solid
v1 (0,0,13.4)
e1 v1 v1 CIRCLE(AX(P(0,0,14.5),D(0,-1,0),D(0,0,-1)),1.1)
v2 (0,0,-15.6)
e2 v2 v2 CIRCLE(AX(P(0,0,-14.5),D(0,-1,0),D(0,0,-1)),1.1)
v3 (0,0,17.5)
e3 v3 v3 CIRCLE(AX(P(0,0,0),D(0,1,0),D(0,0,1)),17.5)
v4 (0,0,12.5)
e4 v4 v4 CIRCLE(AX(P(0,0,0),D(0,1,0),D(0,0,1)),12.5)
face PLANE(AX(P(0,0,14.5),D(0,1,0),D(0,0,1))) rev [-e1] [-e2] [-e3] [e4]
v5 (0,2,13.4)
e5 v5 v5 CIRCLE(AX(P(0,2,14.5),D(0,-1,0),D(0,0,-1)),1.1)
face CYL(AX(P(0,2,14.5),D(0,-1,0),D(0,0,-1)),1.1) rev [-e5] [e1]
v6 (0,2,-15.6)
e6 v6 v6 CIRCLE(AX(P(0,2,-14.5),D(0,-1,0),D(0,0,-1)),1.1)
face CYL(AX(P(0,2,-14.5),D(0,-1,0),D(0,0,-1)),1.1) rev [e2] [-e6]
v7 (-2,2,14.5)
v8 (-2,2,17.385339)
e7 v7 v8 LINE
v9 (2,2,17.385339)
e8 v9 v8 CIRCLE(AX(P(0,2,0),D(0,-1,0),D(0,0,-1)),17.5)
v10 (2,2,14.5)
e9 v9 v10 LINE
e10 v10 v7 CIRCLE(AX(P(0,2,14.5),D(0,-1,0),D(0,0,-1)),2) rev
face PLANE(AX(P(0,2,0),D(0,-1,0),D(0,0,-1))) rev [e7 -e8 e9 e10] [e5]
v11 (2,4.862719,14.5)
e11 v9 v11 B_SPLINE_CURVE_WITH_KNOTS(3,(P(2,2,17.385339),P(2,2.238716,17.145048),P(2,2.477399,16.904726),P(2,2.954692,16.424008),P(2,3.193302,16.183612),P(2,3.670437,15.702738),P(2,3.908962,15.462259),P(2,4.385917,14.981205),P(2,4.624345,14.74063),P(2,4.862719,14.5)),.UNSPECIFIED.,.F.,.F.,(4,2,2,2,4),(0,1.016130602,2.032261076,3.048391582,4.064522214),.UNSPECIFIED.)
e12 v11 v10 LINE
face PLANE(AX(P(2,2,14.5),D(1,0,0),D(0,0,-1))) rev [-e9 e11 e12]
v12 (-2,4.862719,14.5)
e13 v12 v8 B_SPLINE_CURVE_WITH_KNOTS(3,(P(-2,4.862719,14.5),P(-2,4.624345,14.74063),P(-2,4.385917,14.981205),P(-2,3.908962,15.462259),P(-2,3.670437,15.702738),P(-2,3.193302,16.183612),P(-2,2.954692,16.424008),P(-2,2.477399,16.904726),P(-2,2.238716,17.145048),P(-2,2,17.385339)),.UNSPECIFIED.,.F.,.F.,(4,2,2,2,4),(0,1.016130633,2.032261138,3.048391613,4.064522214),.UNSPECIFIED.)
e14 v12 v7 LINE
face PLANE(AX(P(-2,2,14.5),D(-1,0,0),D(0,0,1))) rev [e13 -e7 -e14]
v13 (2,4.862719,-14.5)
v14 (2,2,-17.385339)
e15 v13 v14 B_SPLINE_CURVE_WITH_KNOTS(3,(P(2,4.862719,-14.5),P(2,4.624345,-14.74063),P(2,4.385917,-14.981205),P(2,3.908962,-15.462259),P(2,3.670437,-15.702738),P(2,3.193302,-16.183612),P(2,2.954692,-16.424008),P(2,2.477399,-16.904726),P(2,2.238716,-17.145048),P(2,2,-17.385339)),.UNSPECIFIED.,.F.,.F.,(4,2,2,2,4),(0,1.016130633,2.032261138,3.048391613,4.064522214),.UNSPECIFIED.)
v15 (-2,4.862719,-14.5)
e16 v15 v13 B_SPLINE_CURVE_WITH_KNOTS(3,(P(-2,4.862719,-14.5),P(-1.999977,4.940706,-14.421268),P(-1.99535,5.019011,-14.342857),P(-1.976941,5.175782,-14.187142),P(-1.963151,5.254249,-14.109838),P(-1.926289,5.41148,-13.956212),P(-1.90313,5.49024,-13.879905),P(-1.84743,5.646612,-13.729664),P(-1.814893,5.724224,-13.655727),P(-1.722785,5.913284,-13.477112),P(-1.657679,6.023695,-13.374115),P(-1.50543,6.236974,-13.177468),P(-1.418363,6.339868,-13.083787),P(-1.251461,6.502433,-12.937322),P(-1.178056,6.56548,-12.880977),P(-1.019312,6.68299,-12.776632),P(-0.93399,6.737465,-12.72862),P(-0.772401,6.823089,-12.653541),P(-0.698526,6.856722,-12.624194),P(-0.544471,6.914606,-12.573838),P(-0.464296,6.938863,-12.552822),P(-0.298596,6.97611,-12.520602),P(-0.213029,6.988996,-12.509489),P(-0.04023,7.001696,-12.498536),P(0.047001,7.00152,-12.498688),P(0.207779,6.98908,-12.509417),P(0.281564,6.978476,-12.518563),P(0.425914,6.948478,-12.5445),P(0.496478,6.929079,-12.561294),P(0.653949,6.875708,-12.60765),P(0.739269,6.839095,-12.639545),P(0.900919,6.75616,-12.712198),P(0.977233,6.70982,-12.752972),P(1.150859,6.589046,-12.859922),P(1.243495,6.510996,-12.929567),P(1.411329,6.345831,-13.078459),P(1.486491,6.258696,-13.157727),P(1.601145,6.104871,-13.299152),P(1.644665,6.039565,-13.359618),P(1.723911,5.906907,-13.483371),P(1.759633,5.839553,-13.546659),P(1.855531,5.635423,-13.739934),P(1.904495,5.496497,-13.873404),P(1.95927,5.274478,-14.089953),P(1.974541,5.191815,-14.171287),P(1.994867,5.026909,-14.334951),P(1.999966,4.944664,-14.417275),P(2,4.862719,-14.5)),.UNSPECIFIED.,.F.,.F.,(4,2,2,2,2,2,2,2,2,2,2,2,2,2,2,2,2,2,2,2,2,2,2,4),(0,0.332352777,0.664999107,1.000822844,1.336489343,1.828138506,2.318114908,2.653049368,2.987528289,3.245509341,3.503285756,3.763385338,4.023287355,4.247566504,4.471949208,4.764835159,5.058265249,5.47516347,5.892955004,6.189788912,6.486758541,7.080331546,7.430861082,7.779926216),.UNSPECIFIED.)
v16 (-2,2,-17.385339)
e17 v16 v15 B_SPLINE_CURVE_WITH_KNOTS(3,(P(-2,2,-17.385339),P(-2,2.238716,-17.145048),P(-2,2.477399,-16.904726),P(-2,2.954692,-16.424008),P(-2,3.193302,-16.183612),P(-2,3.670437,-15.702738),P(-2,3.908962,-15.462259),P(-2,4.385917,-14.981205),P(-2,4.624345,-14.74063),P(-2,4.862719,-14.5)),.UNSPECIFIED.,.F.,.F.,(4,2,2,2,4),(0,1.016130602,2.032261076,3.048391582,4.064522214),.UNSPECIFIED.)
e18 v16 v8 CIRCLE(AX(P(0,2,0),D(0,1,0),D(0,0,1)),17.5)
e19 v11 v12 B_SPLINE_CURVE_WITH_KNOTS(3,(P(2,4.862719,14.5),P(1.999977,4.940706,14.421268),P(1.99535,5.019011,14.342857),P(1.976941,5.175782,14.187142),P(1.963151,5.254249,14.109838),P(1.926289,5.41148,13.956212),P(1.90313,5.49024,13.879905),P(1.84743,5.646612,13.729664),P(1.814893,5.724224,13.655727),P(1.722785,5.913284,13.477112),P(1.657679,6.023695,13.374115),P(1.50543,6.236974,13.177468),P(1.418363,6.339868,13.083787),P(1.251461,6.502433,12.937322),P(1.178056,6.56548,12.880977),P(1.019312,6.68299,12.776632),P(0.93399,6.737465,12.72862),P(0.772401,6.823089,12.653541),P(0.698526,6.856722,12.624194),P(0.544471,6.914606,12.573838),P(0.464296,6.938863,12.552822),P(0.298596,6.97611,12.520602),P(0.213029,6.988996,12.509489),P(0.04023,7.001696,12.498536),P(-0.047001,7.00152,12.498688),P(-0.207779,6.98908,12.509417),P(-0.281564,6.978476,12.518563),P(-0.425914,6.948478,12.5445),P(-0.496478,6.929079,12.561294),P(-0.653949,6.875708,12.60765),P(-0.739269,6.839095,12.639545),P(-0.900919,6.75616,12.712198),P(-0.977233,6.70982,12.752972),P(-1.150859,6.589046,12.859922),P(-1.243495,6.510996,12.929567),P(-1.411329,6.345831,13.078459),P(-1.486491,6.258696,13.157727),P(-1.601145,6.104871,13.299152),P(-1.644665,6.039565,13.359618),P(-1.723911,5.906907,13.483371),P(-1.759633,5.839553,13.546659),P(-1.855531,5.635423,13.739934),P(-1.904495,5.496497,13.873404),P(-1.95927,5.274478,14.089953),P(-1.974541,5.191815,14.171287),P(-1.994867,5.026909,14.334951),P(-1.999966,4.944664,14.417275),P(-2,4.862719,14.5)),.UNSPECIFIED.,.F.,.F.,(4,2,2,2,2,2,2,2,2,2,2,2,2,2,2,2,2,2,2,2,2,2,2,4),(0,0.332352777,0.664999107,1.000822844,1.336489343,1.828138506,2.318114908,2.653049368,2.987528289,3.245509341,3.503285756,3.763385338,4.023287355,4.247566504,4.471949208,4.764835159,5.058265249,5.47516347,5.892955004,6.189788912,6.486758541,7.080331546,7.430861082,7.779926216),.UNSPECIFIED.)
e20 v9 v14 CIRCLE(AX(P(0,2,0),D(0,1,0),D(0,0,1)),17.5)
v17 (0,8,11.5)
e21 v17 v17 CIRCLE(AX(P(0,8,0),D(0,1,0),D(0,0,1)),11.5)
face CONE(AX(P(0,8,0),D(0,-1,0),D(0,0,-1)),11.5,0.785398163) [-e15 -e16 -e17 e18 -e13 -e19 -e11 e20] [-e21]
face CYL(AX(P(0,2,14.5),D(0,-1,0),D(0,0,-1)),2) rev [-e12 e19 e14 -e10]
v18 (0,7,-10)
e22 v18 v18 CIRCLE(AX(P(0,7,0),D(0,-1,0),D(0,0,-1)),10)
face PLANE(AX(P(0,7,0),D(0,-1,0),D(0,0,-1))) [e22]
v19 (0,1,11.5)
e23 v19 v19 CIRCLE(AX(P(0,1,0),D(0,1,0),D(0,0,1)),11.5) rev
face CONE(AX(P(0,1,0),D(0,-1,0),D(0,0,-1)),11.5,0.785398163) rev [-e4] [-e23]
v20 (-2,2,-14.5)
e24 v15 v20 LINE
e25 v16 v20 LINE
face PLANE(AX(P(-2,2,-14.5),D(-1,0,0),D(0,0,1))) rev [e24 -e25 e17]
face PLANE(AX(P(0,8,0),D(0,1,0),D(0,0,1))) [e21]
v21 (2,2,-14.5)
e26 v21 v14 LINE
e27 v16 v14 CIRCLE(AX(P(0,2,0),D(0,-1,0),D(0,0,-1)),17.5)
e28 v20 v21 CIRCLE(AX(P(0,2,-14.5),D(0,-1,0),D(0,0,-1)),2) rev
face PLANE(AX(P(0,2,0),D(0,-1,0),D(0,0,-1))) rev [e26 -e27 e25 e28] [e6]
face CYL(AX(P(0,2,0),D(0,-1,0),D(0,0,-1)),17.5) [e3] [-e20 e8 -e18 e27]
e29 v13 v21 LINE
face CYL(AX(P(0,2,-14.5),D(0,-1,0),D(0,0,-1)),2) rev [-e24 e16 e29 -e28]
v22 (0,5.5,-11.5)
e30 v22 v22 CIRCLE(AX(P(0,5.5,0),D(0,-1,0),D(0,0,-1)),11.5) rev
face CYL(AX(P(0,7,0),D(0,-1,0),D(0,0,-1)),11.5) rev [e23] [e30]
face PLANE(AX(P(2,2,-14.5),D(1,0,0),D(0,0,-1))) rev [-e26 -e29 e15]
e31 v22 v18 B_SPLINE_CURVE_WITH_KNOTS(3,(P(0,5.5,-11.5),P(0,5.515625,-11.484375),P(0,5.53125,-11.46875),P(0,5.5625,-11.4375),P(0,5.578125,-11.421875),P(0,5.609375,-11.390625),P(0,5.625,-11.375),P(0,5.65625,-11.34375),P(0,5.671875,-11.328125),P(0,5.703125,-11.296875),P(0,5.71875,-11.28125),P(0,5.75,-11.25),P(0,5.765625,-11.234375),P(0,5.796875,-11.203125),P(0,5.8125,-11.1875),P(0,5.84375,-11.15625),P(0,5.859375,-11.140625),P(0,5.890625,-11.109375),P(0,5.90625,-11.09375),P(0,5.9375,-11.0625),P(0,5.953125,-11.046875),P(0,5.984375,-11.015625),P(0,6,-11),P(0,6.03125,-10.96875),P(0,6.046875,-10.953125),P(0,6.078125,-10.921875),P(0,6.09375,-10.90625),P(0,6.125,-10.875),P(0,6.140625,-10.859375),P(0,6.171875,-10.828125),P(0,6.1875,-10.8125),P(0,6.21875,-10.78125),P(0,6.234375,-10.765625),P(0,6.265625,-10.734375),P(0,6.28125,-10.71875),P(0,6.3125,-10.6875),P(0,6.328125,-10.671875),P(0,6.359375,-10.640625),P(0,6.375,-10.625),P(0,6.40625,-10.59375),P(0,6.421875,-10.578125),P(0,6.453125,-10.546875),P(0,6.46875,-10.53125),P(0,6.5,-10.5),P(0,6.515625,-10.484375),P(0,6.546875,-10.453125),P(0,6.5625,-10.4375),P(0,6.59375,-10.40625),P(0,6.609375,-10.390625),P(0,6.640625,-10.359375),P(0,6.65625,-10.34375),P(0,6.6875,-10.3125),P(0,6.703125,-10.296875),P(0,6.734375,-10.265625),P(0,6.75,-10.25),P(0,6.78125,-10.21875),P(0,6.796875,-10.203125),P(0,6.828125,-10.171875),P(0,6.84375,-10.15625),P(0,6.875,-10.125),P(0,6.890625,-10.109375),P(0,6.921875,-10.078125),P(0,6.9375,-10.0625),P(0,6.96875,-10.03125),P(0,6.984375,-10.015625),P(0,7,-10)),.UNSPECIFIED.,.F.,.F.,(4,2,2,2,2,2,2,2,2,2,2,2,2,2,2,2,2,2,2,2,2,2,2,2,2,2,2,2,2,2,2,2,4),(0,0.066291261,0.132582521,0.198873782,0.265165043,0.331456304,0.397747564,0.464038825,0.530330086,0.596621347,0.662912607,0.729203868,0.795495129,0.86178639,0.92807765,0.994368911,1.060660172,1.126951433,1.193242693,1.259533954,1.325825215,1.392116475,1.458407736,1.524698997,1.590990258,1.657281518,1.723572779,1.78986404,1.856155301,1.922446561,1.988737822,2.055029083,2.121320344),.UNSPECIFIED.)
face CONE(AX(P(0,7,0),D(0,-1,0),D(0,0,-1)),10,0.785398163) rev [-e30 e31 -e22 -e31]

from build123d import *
from build123d.topology import SkipClean

# Parameters (mm, degrees)
BOSS_EXTRUDE1_DEPTH = 2
SKETCH2_R           = 11.5
BOSS_EXTRUDE2_DEPTH = 6
CHAMFER1_START      = 2
CHAMFER1_2_DEPTH    = 6
SKETCH6_R           = 17.5
SKETCH6_R_2         = 1.1
BOSS_EXTRUDE3_DEPTH = 2
SKETCH7_R           = 11.5
CUT_EXTRUDE1_DEPTH  = 7
CHAMFER2_SIZE       = 1.5
CHAMFER3_SIZE       = 1


with BuildPart() as part:
    # Sketch1 → Boss-Extrude1 (new body)
    with BuildSketch(Plane(origin=(0, 0, 0), x_dir=(1, 0, 0), z_dir=(0, 1, 0))):
        with BuildLine():
            Line((-2, 14.5), (-2, 17.385338651))
            ThreePointArc((-2, 17.385338651), (-17.5, 0), (-2, -17.385338651))
            Line((-2, -17.385338651), (-2, -14.5))
            ThreePointArc((-2, -14.5), (0, -12.5), (2, -14.5))
            Line((2, -14.5), (2, -17.385338651))
            ThreePointArc((2, -17.385338651), (17.5, 0), (2, 17.385338651))
            Line((2, 17.385338651), (2, 14.5))
            ThreePointArc((2, 14.5), (0, 12.5), (-2, 14.5))
        make_face()
    extrude(amount=BOSS_EXTRUDE1_DEPTH)

    # Sketch2 → Boss-Extrude2 (add)
    with BuildSketch(Plane(origin=(0, 2, 0), x_dir=(1, 0, 0), z_dir=(0, 1, 0))):
        with Locations(Location((0, 0, 0), (0, 0, 270))):
            Circle(SKETCH2_R)
    extrude(amount=BOSS_EXTRUDE2_DEPTH)

    # Chamfer1: read off the stored shape, not the designer's step
    # Chamfer1 outline → Chamfer1 (revolve)
    with BuildSketch(Plane.XY):
        Polygon((17.5, 2), (11.5, 8), (11.5, 2), align=None)
    revolve(axis=Axis((0, 0, 0), (0, 1, 0)))

    # Chamfer1 2 outline → Chamfer1 2 (cut)
    with BuildSketch(Plane(origin=(0, 0, 0), x_dir=(1, 0, 0), z_dir=(0, 1, 0)).offset(CHAMFER1_START)):
        with BuildLine():
            ThreePointArc((2, -14.5), (0, -12.5), (-2, -14.5))
            Line((-2, -14.5), (-2, -19))
            Line((-2, -19), (2, -19))
            Line((2, -19), (2, -14.5))
        make_face()
        with BuildLine():
            Line((2, 19), (-2, 19))
            Line((-2, 19), (-2, 14.5))
            ThreePointArc((-2, 14.5), (0, 12.5), (2, 14.5))
            Line((2, 14.5), (2, 19))
        make_face()
    extrude(amount=CHAMFER1_2_DEPTH, mode=Mode.SUBTRACT)

    # Sketch6 → Boss-Extrude3 (add)
    with SkipClean():  # the faces are left unmerged after this step: merging them gives an invalid solid
        with BuildSketch(Plane.XZ):
            with Locations(Location((0, 0, 0), (0, 0, 263.437572131))):
                Circle(SKETCH6_R)
            with Locations(Location((0, 14.5, 0), (0, 0, 270))):
                Circle(SKETCH6_R_2, mode=Mode.SUBTRACT)
            with Locations(Location((0, -14.5, 0), (0, 0, 270))):
                Circle(SKETCH6_R_2, mode=Mode.SUBTRACT)
        extrude(amount=-BOSS_EXTRUDE3_DEPTH)

    # Sketch7 → Cut-Extrude1 (cut)
    with SkipClean():  # the faces are left unmerged after this step: merging them gives an invalid solid
        with BuildSketch(Plane.XZ):
            with Locations(Location((0, 0, 0), (0, 0, 270))):
                Circle(SKETCH7_R)
        extrude(amount=-CUT_EXTRUDE1_DEPTH, mode=Mode.SUBTRACT)

    # Chamfer2
    chamfer2_edges = [part.edges().sort_by_distance(p)[0] for p in [
        (0, 7, 11.5),
    ]]
    chamfer(chamfer2_edges, length=CHAMFER2_SIZE)

    # Chamfer3
    chamfer3_edges = [part.edges().sort_by_distance(p)[0] for p in [
        (0, 0, 11.5),
    ]]
    chamfer(chamfer3_edges, length=CHAMFER3_SIZE - 0.0001)  # a hair under: the kernel refuses the full size


solid = part.part
